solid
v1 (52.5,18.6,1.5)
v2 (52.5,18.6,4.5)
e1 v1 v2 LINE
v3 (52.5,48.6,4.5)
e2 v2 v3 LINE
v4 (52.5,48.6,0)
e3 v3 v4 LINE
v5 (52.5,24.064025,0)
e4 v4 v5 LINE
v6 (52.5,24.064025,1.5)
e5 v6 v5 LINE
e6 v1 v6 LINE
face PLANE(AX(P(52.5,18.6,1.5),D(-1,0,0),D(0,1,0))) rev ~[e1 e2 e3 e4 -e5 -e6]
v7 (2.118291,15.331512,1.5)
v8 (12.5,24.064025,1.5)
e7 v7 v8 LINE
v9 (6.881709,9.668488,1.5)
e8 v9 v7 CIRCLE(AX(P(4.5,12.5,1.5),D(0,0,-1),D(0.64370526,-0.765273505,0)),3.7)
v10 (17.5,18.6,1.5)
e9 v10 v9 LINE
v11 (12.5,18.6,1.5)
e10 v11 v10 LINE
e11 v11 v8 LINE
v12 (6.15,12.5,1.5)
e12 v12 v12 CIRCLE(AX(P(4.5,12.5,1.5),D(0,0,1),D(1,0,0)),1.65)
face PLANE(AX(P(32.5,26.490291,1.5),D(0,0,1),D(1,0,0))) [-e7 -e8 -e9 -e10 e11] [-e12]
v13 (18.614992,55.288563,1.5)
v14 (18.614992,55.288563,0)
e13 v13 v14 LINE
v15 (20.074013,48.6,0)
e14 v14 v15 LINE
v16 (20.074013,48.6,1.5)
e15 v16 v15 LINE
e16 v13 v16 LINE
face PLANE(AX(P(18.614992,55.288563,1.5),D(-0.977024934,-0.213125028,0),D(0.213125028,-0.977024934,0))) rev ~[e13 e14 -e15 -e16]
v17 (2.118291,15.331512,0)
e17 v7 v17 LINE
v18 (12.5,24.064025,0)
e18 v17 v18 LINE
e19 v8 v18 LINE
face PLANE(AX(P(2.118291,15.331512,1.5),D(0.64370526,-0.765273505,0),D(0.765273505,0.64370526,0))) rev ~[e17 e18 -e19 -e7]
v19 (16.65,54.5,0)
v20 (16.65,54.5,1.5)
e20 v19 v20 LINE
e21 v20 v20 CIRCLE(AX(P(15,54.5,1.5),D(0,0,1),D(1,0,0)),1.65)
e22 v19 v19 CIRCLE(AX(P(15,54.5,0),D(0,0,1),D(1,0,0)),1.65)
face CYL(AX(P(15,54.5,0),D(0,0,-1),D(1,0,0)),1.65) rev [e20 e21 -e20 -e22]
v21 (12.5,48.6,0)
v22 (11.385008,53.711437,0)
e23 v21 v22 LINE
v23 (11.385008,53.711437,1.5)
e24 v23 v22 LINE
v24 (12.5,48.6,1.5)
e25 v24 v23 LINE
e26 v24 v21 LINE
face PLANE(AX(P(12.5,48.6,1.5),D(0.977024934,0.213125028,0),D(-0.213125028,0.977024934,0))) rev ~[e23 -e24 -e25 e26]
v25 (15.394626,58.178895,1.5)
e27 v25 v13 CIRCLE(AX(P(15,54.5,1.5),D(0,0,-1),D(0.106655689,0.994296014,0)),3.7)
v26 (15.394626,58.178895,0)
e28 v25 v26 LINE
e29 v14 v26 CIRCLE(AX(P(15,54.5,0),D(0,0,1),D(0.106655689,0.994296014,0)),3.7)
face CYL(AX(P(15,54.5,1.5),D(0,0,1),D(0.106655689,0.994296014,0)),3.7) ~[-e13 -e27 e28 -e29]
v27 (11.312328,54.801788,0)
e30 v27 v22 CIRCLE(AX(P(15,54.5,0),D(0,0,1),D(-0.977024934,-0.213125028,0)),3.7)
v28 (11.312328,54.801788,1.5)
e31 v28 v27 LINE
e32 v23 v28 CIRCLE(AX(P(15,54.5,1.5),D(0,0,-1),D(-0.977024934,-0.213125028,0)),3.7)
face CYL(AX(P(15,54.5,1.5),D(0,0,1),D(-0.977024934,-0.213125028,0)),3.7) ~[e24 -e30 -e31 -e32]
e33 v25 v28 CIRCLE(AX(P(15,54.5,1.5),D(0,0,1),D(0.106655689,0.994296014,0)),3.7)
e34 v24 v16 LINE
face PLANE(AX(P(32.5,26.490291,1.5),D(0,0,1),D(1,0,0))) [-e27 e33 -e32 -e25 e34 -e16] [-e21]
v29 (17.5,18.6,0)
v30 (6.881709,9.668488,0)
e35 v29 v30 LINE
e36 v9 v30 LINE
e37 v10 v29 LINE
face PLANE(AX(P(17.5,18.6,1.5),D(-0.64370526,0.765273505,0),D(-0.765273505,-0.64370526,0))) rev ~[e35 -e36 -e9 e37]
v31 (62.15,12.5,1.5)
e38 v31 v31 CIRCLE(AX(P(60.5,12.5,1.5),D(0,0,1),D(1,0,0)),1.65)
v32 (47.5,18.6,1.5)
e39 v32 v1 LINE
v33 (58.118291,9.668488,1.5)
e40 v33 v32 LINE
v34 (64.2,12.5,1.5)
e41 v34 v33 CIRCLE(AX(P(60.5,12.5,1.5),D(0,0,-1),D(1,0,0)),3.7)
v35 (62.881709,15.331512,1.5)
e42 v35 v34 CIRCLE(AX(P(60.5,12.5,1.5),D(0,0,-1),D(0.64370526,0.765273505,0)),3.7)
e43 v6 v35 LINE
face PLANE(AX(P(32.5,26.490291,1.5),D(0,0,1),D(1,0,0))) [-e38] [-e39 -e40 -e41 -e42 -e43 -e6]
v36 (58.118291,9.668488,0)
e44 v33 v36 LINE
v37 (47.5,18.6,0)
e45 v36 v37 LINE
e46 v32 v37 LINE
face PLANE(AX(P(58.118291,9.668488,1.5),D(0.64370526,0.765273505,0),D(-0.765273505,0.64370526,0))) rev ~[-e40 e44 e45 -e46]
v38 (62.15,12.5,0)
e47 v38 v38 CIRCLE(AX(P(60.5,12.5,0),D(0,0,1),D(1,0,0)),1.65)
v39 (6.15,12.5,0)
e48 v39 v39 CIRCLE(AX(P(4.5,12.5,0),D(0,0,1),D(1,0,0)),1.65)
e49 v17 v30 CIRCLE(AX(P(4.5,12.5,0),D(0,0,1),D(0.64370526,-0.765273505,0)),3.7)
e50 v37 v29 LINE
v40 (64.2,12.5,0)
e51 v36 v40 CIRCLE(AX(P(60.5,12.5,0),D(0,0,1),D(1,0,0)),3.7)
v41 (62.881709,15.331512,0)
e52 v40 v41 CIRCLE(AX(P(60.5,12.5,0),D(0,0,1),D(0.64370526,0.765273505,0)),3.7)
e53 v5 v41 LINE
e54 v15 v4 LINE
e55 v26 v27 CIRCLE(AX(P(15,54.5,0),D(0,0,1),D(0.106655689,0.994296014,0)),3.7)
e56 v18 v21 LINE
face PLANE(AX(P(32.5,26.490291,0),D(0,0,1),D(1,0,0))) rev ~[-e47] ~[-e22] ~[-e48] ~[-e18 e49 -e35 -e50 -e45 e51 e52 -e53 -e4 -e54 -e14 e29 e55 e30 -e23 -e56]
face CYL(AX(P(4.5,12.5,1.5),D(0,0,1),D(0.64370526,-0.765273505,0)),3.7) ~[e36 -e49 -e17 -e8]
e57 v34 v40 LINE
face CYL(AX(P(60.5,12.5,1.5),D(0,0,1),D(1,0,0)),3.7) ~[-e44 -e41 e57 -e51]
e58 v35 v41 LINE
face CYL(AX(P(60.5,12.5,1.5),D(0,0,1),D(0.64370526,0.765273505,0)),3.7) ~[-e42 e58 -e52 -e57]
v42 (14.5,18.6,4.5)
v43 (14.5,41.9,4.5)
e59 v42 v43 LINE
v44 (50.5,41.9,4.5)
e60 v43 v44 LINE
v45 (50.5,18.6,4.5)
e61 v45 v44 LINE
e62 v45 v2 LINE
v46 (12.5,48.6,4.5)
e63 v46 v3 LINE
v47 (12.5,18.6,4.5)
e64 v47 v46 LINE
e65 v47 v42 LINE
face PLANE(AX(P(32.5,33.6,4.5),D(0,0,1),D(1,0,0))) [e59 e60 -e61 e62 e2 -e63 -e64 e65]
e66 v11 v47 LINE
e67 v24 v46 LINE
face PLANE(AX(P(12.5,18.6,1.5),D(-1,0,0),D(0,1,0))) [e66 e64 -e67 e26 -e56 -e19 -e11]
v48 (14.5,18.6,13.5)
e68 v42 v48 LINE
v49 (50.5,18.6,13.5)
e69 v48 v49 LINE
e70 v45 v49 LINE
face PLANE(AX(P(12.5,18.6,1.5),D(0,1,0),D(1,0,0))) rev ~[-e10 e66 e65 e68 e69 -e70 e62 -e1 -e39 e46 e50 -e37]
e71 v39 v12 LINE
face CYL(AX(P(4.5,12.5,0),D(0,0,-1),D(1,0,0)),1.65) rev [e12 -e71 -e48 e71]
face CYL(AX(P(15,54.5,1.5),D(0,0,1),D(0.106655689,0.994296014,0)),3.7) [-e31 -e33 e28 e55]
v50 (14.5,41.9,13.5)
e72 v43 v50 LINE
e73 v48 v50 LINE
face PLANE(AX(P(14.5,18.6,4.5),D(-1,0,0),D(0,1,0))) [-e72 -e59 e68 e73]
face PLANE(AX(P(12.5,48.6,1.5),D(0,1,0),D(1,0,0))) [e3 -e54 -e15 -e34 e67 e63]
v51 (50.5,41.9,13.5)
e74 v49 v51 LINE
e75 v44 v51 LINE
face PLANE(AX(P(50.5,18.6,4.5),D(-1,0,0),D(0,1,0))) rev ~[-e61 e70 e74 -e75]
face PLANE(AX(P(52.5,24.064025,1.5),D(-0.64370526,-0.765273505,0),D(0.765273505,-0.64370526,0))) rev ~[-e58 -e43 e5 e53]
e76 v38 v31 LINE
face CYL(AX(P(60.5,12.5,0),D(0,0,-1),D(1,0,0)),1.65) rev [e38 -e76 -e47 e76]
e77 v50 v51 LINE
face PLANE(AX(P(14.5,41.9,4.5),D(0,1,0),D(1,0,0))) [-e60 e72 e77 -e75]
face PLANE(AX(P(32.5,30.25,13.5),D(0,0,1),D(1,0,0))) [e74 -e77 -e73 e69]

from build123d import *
from build123d import SkipClean  # not in build123d's __all__

# Parameters (mm, degrees)
F0_R     = 1.65
F1_DEPTH = 1.5
F3_DEPTH = 1.501
F4_DEPTH = 1.5
F5_W     = 40
F5_H     = 30
F6_DEPTH = 3
F7_W     = 36
F7_H     = 23.3
F8_DEPTH = 9


with BuildPart() as f1:
    # F0 (on Top) → F1 (new body)
    with BuildSketch(Plane.XY):
        with BuildLine():
            ThreePointArc((-0.73370891, 14), (-0.4891889552, 6.9935887205), (0, 0))
            Line((0, 0), (65, 0))
            ThreePointArc((65, 0), (65.4891889552, 6.9935887205), (65.73370891, 14))
            ThreePointArc((65.73370891, 14), (65.7334108185, 21.0021379582), (65.488741818, 28))
            Line((65.488741818, 28), (57.299411547, 50.5))
            ThreePointArc((57.299411547, 50.5), (32.5, 63.5), (7.700588453, 50.5))
            Line((7.700588453, 50.5), (-0.488741818, 28))
            ThreePointArc((-0.488741818, 28), (-0.7334108185, 21.0021379582), (-0.73370891, 14))
        make_face()
        with Locations((4.5, 12.5)):
            Circle(F0_R, mode=Mode.SUBTRACT)
        with Locations((60.5, 12.5)):
            Circle(F0_R, mode=Mode.SUBTRACT)
        with Locations((15, 54.5)):
            Circle(F0_R, mode=Mode.SUBTRACT)
    extrude(amount=F1_DEPTH)

    # F2 (on face) → F3 (cut, through all)
    with BuildSketch(Plane.XY.offset(1.5)):
        with BuildLine():
            ThreePointArc((15.3946260476, 58.178895253), (17.4713893755, 57.2535857631), (18.6149922575, 55.2885626028))
            Line((18.6149922575, 55.2885626028), (20.0740134556, 48.6))
            Line((20.0740134556, 48.6), (52.5, 48.6))
            Line((52.5, 48.6), (52.5, 24.064025175))
            Line((52.5, 24.064025175), (62.8817094627, 15.3315119698))
            ThreePointArc((62.8817094627, 15.3315119698), (63.8542752579, 14.0616777817), (64.2, 12.5))
            ThreePointArc((64.2, 12.5), (62.0616777817, 9.1457247421), (58.1182905373, 9.6684880302))
            Line((58.1182905373, 9.6684880302), (47.5, 18.6))
            Line((47.5, 18.6), (17.5, 18.6))
            Line((17.5, 18.6), (6.8817094627, 9.6684880302))
            ThreePointArc((6.8817094627, 9.6684880302), (1.6684880302, 10.1182905373), (2.1182905373, 15.3315119698))
            Line((2.1182905373, 15.3315119698), (12.5, 24.064025175))
            Line((12.5, 24.064025175), (12.5, 48.6))
            Line((12.5, 48.6), (11.3850077425, 53.7114373972))
            ThreePointArc((11.3850077425, 53.7114373972), (11.308192582, 54.2539146721), (11.3123280961, 54.8017878876))
            ThreePointArc((11.3123280961, 54.8017878876), (9.4060764304, 52.7351735725), (7.700588453, 50.5))
            Line((7.700588453, 50.5), (-0.488741818, 28))
            ThreePointArc((-0.488741818, 28), (-0.733560046, 13.9914611719), (0, 0))
            Line((0, 0), (65, 0))
            ThreePointArc((65, 0), (65.733560046, 13.9914611719), (65.488741818, 28))
            Line((65.488741818, 28), (57.299411547, 50.5))
            ThreePointArc((57.299411547, 50.5), (37.9351551683, 63.0061258111), (15.3946260476, 58.178895253))
        make_face()
    extrude(amount=-F3_DEPTH, mode=Mode.SUBTRACT)

    # F2 (on face) → F4 (join)
    with BuildSketch(Plane.XY.offset(1.5)):
        with BuildLine():
            ThreePointArc((11.3123280961, 54.8017878876), (13.2791635515, 56.5801728664), (15.3946260476, 58.178895253))
            ThreePointArc((15.3946260476, 58.178895253), (12.6415574435, 57.3509206772), (11.3123280961, 54.8017878876))
        make_face()
    with SkipClean():  # cleaning this boolean's faces spoils the solid; the shape is the same uncleaned
        extrude(amount=-F4_DEPTH)

    # F5 (on face) → F6 (join)
    with BuildSketch(Plane.XY.offset(1.5)):
        with Locations((32.5, 33.6)):
            Rectangle(F5_W, F5_H)
    extrude(amount=F6_DEPTH)

    # F7 (on face) → F8 (join)
    with BuildSketch(Plane.XY.offset(4.5)):
        with Locations((32.5, 30.25)):
            Rectangle(F7_W, F7_H)
    extrude(amount=F8_DEPTH)


solid = f1.part
